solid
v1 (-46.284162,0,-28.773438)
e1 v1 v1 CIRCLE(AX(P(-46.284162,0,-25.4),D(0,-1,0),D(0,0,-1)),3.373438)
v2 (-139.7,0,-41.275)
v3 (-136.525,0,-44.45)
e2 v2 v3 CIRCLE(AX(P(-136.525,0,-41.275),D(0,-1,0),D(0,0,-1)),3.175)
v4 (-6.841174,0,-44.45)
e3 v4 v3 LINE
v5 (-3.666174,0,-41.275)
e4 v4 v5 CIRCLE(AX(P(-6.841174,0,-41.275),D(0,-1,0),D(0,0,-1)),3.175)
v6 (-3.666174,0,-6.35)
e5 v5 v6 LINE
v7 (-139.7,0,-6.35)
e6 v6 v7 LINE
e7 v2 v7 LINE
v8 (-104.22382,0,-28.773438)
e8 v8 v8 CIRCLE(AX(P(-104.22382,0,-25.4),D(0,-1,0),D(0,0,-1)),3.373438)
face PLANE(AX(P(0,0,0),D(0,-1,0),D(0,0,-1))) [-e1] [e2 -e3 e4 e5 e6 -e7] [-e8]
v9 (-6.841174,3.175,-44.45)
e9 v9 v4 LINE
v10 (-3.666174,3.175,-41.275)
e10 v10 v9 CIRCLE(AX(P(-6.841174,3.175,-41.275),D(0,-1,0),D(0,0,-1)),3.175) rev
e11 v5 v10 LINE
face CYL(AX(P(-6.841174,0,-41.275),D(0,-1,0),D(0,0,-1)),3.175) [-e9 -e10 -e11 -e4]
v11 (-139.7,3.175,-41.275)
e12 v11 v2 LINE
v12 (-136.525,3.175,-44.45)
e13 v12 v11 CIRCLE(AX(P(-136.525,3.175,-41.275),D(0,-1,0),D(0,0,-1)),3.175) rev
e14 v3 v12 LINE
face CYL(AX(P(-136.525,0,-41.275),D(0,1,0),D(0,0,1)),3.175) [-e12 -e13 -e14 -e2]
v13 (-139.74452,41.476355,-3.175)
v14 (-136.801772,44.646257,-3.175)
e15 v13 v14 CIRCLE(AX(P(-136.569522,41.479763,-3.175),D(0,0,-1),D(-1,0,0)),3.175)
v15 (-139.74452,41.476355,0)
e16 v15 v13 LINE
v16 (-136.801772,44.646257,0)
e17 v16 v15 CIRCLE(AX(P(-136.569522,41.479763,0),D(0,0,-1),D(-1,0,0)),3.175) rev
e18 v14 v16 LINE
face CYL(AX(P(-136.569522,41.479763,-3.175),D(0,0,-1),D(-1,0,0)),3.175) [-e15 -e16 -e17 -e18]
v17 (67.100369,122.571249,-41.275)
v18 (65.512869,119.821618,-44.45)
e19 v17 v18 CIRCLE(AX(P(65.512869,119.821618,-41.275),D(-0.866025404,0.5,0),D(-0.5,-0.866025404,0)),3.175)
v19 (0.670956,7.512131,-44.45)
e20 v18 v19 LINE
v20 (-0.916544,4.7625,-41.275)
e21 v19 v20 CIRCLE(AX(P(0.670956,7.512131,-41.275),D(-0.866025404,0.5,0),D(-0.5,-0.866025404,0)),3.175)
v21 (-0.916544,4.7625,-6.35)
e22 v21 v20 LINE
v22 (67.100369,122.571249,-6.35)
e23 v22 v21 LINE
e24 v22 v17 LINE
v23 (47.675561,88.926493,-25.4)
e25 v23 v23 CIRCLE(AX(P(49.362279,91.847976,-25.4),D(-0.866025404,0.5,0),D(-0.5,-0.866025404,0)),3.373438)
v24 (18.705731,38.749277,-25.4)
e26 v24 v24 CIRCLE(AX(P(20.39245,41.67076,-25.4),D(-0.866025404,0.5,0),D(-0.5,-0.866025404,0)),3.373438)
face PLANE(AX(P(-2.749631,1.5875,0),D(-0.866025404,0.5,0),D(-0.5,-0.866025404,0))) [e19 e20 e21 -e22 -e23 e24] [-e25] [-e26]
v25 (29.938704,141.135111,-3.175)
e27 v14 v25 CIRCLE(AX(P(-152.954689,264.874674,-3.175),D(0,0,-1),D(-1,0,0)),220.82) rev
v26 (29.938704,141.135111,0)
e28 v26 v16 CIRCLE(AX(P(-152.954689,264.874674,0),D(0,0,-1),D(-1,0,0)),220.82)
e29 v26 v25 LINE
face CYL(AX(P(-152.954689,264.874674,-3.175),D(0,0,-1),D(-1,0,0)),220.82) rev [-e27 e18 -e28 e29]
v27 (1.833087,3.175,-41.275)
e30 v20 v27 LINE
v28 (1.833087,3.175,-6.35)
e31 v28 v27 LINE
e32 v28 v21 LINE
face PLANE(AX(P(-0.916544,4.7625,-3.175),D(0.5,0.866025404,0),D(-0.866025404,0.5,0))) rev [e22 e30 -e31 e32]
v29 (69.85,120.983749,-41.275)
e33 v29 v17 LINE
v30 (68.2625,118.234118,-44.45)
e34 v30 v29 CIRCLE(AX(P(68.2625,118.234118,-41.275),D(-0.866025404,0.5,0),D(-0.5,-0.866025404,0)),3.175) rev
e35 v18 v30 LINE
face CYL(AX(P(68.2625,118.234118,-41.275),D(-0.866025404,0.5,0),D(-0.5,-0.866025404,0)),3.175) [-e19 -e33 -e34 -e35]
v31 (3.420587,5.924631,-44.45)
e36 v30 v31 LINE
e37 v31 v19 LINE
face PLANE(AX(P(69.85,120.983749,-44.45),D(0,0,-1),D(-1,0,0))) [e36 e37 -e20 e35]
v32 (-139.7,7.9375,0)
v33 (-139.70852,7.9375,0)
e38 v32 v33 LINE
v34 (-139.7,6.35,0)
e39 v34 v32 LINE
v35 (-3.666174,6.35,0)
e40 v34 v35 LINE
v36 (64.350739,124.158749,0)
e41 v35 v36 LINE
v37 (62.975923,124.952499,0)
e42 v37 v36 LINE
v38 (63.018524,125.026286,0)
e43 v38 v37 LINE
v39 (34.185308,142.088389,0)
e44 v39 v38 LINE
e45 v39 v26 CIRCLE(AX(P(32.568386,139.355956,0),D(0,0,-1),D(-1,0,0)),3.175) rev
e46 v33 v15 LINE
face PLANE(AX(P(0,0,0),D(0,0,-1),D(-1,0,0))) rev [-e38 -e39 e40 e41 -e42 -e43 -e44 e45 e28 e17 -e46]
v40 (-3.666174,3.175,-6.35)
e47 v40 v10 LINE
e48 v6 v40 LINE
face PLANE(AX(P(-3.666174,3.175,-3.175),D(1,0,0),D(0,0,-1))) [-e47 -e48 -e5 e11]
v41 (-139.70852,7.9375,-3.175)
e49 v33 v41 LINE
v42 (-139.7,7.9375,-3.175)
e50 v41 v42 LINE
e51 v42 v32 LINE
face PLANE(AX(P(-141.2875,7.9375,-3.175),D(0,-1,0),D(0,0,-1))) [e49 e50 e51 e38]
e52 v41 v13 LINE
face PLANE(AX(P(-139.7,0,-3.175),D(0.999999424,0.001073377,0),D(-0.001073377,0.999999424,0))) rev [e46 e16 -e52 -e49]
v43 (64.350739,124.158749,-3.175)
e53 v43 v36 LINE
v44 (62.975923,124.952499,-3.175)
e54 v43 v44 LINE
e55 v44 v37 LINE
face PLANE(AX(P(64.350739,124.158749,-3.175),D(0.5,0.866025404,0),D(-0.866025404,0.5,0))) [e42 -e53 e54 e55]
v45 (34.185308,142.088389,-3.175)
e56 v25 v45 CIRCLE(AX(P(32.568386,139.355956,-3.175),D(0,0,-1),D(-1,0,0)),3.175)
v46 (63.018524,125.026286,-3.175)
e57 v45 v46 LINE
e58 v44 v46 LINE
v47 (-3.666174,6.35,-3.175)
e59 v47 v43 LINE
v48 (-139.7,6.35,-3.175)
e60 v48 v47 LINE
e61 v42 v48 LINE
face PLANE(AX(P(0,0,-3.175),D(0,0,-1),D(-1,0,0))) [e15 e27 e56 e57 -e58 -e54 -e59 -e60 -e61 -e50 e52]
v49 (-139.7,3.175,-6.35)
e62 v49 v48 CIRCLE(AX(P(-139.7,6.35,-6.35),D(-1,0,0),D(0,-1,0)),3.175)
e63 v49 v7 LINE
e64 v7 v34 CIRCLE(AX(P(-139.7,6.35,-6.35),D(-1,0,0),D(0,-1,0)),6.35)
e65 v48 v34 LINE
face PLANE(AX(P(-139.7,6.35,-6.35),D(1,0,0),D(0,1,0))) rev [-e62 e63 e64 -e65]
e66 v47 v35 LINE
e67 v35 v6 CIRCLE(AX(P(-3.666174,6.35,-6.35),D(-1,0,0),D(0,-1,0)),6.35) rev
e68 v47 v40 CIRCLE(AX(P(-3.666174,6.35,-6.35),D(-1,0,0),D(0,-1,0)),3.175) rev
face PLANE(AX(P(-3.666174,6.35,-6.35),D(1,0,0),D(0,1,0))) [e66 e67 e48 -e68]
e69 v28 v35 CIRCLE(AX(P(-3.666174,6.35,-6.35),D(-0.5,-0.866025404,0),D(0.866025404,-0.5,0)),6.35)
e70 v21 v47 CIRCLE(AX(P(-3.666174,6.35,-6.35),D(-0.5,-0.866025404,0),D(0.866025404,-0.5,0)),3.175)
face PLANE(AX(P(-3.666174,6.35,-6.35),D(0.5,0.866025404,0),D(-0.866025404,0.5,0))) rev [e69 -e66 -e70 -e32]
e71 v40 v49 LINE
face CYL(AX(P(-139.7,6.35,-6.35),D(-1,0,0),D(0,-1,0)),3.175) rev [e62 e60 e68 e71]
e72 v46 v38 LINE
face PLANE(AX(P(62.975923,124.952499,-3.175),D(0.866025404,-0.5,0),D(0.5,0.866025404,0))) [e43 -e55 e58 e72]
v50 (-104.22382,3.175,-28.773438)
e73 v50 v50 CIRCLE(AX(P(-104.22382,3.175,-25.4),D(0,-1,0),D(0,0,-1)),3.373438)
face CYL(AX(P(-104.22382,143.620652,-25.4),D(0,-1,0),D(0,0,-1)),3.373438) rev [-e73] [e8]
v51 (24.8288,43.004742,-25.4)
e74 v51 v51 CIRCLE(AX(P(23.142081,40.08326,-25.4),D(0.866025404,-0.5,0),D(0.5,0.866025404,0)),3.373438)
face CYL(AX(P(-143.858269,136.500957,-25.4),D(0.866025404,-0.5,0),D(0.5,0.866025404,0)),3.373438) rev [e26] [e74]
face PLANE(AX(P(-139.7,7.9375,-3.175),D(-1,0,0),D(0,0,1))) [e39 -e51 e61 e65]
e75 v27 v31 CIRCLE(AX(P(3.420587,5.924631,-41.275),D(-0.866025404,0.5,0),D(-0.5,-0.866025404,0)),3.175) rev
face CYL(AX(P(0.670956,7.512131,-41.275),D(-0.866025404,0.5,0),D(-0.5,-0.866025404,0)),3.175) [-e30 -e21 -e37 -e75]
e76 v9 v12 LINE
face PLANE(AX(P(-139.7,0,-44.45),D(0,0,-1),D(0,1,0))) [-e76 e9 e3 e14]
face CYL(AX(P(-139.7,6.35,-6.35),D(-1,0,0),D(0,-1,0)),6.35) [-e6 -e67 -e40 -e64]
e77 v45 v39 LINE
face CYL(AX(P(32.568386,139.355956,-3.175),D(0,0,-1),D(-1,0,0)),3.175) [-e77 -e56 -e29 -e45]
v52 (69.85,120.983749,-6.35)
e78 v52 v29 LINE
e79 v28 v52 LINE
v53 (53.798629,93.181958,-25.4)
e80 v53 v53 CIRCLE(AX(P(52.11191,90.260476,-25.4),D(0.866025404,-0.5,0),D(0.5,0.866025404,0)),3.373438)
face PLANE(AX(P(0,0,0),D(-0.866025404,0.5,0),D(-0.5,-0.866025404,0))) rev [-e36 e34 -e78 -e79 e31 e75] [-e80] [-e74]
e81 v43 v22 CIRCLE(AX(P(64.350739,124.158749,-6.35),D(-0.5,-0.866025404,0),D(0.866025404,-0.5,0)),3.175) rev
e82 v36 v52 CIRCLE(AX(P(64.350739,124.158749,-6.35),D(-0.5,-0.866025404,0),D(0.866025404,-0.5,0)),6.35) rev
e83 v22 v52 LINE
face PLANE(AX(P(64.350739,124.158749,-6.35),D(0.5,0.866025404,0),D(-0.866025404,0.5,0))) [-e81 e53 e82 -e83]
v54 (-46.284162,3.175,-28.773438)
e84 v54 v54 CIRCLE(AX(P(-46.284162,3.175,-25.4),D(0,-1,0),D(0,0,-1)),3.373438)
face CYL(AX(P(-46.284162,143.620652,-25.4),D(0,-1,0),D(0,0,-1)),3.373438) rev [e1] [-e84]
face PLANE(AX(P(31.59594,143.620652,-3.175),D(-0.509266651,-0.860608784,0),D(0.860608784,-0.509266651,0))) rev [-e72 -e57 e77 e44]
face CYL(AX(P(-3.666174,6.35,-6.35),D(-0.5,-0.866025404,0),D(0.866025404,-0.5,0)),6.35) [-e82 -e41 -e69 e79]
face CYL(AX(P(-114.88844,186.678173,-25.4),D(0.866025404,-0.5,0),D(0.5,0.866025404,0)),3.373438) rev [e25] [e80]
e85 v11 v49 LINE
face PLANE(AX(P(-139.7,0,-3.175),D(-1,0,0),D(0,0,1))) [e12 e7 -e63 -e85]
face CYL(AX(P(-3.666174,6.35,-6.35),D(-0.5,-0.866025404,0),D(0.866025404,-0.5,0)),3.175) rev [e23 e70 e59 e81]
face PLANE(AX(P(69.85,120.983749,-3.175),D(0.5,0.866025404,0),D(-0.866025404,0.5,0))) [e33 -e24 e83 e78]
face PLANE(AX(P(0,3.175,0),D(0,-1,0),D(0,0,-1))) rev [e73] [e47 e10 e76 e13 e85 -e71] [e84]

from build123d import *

# Parameters (mm, degrees)
BASE_FLANGE1_START       = -3.175
BASE_FLANGE1_DEPTH       = 3.175
EDGE_FLANGE1_START       = -0.3353435
EDGE_FLANGE1_DEPTH       = 0.3353435
EDGE_FLANGE1_START_2     = -3.175
EDGE_FLANGE1_2_DEPTH     = 3.175
EDGE_FLANGE1_START_3     = -44.45
EDGE_FLANGE1_3_OUTLINE_W = 136.033825791
EDGE_FLANGE1_3_OUTLINE_H = 3.175
EDGE_FLANGE1_3_DEPTH     = 38.1
EDGE_FLANGE1_START_4     = -139.7
EDGE_FLANGE1_4_DEPTH     = 136.033825791
EDGE_FLANGE1_START_5     = 3.666174209
EDGE_FLANGE1_5_DEPTH     = 136.033825791
EDGE_FLANGE1_6_DEPTH     = 146.096388787
EDGE_FLANGE1_START_6     = -69.85
EDGE_FLANGE1_7_DEPTH     = 209.55
FILLET2_R                = 220.82
SKETCH15_R               = 3.3734375
CUT_EXTRUDE1_DEPTH       = 206.261094571
SKETCH16_R               = 3.3734375
CUT_EXTRUDE2_DEPTH       = 206.261094571
FILLET3_R                = 3.175


with BuildPart() as part:
    # Base-Flange1: read off the stored shape, not the designer's step
    # Base-Flange1 outline → Base-Flange1 (new body)
    with BuildSketch(Plane.XY.offset(BASE_FLANGE1_START)):
        Polygon((69.85, 120.983748909), (31.595939562, 143.620651524), (-25.447777456, 44.572661394), (-139.747711611, 44.449974394), (-139.7, 0), (0, 0), align=None)
    extrude(amount=BASE_FLANGE1_DEPTH)

    # Edge-Flange1: read off the stored shape, not the designer's step
    # Edge-Flange1 outline → Edge-Flange1 (cut)
    with BuildSketch(Plane.XY.offset(EDGE_FLANGE1_START)):
        Polygon((-139.7, 7.9375), (-139.708519936, 7.9375), (-139.7, 0), (0, 0), (1.833087105, 3.175), (69.85, 120.983748909), (63.01852425, 125.026285819), (62.975923357, 124.952498909), (64.350738686, 124.158748909), (67.100369343, 122.571248909), (-0.916543552, 4.7625), (-3.666174209, 6.35), (-3.666174209, 3.175), (-139.7, 3.175), align=None)
    extrude(amount=EDGE_FLANGE1_DEPTH, mode=Mode.SUBTRACT)

    # Edge-Flange1 2 outline → Edge-Flange1 2 (cut)
    with BuildSketch(Plane.XY.offset(EDGE_FLANGE1_START_2)):
        Polygon((-139.7, 7.9375), (-139.708519936, 7.9375), (-139.7, 0), align=None)
        Polygon((-3.666174209, 6.35), (-3.666174209, 0), (0, 0), (1.833087105, 3.175), align=None)
        Polygon((64.350738686, 124.158748909), (69.85, 120.983748909), (63.01852425, 125.026285819), (62.975923357, 124.952498909), align=None)
    extrude(amount=EDGE_FLANGE1_2_DEPTH, mode=Mode.SUBTRACT)



with BuildPart() as body_2:
    # Edge-Flange1 3 outline → Edge-Flange1 3 (new body)
    with BuildSketch(Plane.XY.offset(EDGE_FLANGE1_START_3)):
        with Locations((-71.683087105, 1.5875)):
            Rectangle(EDGE_FLANGE1_3_OUTLINE_W, EDGE_FLANGE1_3_OUTLINE_H)
        Polygon((-0.916543552, 4.7625), (1.833087105, 3.175), (69.85, 120.983748909), (67.100369343, 122.571248909), align=None)
    extrude(amount=EDGE_FLANGE1_3_DEPTH)


with BuildPart() as part_1:
    add(part.part)

    add(body_2.part)  # Edge-Flange1 4 merges body 2
    # Edge-Flange1 4 outline → Edge-Flange1 4 (add)
    with BuildSketch(Plane.YZ.offset(EDGE_FLANGE1_START_4)):
        with BuildLine():
            ThreePointArc((0.850738685, -3.175), (0.216371003, -4.706499064), (0, -6.35))
            Line((0, -6.35), (3.175, -6.35))
            ThreePointArc((3.175, -6.35), (4.10493597, -4.10493597), (6.35, -3.175))
            Line((6.35, -3.175), (0.850738685, -3.175))
        make_face()
    extrude(amount=EDGE_FLANGE1_4_DEPTH)

    # Edge-Flange1 5 outline → Edge-Flange1 5 (add)
    with BuildSketch(Plane(origin=(0, 0, 0), x_dir=(0.866025403784418, -0.500000000000036, 0), z_dir=(0.500000000000036, 0.866025403784418, 0)).offset(EDGE_FLANGE1_START_5)):
        with BuildLine():
            ThreePointArc((-0.850738685, 3.175), (-0.216371003, 4.706499064), (0, 6.35))
            Line((0, 6.35), (-3.175, 6.35))
            ThreePointArc((-3.175, 6.35), (-4.10493597, 4.10493597), (-6.35, 3.175))
            Line((-6.35, 3.175), (-0.850738685, 3.175))
        make_face()
    extrude(amount=EDGE_FLANGE1_5_DEPTH)

    # Edge-Flange1 6 outline → Edge-Flange1 6 (cut)
    with BuildSketch(Plane.YZ.offset(EDGE_FLANGE1_START_4)):
        with BuildLine():
            Line((0, -3.175), (0.850738685, -3.175))
            ThreePointArc((0.850738685, -3.175), (3.174999999, -0.850738686), (6.35, 0))
            Line((6.35, 0), (3.175, 0))
            Line((3.175, 0), (3.175, -0.3353435))
            Line((3.175, -0.3353435), (0, -0.3353435))
            Line((0, -0.3353435), (0, -3.175))
        make_face()
    extrude(amount=EDGE_FLANGE1_6_DEPTH, mode=Mode.SUBTRACT)

    # Edge-Flange1 7 outline → Edge-Flange1 7 (cut)
    with BuildSketch(Plane(origin=(0, 0, 0), x_dir=(0.866025403784418, -0.500000000000036, 0), z_dir=(0.500000000000036, 0.866025403784418, 0)).offset(EDGE_FLANGE1_START_6)):
        with BuildLine():
            Line((0, 3.175), (-0.850738685, 3.175))
            ThreePointArc((-0.850738685, 3.175), (-3.174999999, 0.850738686), (-6.35, 0))
            Line((-6.35, 0), (-3.175, 0))
            Line((-3.175, 0), (-3.175, 0.3353435))
            Line((-3.175, 0.3353435), (0, 0.3353435))
            Line((0, 0.3353435), (0, 3.175))
        make_face()
    extrude(amount=EDGE_FLANGE1_7_DEPTH, mode=Mode.SUBTRACT)

    # Fillet2
    # the kernel refuses this fillet: 220.82 mm, written as the material it adds along each edge
    with BuildSketch(Plane(origin=(-25.447777456, 44.572661394, -3.175), x_dir=(0.49907014013952505, 0.8665615934376014, 0), z_dir=(0, 0, 1))) as fillet2_piece_1:
        with BuildLine():
            CenterArc((127.27037084, 220.438748591), FILLET2_R, 213.36733761, 53.265324779)
            Line((-57.149999999, 98.986703653), (0, 0))
            Line((0, 0), (114.3, 0))
        make_face()
    extrude(amount=3.175)

    # Sketch15 → Cut-Extrude1 (cut, through all)
    with BuildSketch(Plane(origin=(0, 0, 0), x_dir=(0, 0, -1), z_dir=(0.8660254037844249, -0.5000000000000239, 3.506248131957107e-15))):
        with Locations(Location((25.4, 104.22382, 0), (0, 0, 90))):
            Circle(SKETCH15_R)
        with Locations(Location((25.4, 46.284161604, 0), (0, 0, 90))):
            Circle(SKETCH15_R)
    extrude(amount=-CUT_EXTRUDE1_DEPTH, mode=Mode.SUBTRACT)

    # Sketch16 → Cut-Extrude2 (cut, through all)
    with BuildSketch(Plane.XZ):
        with Locations(Location((-104.22382, -25.4, 0), (0, 0, 270))):
            Circle(SKETCH16_R)
        with Locations(Location((-46.284161686, -25.4, 0), (0, 0, 270))):
            Circle(SKETCH16_R)
    extrude(amount=-CUT_EXTRUDE2_DEPTH, mode=Mode.SUBTRACT)

    # Fillet3
    fillet3_edges = [part_1.edges().sort_by_distance(p)[0] for p in [
        (31.595939562, 143.620651524, -1.5875),
        (-139.747711611, 44.449974394, -1.5875),
        (-3.666174209, 1.5875, -44.45),
        (-139.7, 1.5875, -44.45),
        (68.475184671, 121.777498909, -44.45),
        (0.458271776, 3.96875, -44.45),
    ]]
    fillet(fillet3_edges, radius=FILLET3_R)


solid = part_1.part
